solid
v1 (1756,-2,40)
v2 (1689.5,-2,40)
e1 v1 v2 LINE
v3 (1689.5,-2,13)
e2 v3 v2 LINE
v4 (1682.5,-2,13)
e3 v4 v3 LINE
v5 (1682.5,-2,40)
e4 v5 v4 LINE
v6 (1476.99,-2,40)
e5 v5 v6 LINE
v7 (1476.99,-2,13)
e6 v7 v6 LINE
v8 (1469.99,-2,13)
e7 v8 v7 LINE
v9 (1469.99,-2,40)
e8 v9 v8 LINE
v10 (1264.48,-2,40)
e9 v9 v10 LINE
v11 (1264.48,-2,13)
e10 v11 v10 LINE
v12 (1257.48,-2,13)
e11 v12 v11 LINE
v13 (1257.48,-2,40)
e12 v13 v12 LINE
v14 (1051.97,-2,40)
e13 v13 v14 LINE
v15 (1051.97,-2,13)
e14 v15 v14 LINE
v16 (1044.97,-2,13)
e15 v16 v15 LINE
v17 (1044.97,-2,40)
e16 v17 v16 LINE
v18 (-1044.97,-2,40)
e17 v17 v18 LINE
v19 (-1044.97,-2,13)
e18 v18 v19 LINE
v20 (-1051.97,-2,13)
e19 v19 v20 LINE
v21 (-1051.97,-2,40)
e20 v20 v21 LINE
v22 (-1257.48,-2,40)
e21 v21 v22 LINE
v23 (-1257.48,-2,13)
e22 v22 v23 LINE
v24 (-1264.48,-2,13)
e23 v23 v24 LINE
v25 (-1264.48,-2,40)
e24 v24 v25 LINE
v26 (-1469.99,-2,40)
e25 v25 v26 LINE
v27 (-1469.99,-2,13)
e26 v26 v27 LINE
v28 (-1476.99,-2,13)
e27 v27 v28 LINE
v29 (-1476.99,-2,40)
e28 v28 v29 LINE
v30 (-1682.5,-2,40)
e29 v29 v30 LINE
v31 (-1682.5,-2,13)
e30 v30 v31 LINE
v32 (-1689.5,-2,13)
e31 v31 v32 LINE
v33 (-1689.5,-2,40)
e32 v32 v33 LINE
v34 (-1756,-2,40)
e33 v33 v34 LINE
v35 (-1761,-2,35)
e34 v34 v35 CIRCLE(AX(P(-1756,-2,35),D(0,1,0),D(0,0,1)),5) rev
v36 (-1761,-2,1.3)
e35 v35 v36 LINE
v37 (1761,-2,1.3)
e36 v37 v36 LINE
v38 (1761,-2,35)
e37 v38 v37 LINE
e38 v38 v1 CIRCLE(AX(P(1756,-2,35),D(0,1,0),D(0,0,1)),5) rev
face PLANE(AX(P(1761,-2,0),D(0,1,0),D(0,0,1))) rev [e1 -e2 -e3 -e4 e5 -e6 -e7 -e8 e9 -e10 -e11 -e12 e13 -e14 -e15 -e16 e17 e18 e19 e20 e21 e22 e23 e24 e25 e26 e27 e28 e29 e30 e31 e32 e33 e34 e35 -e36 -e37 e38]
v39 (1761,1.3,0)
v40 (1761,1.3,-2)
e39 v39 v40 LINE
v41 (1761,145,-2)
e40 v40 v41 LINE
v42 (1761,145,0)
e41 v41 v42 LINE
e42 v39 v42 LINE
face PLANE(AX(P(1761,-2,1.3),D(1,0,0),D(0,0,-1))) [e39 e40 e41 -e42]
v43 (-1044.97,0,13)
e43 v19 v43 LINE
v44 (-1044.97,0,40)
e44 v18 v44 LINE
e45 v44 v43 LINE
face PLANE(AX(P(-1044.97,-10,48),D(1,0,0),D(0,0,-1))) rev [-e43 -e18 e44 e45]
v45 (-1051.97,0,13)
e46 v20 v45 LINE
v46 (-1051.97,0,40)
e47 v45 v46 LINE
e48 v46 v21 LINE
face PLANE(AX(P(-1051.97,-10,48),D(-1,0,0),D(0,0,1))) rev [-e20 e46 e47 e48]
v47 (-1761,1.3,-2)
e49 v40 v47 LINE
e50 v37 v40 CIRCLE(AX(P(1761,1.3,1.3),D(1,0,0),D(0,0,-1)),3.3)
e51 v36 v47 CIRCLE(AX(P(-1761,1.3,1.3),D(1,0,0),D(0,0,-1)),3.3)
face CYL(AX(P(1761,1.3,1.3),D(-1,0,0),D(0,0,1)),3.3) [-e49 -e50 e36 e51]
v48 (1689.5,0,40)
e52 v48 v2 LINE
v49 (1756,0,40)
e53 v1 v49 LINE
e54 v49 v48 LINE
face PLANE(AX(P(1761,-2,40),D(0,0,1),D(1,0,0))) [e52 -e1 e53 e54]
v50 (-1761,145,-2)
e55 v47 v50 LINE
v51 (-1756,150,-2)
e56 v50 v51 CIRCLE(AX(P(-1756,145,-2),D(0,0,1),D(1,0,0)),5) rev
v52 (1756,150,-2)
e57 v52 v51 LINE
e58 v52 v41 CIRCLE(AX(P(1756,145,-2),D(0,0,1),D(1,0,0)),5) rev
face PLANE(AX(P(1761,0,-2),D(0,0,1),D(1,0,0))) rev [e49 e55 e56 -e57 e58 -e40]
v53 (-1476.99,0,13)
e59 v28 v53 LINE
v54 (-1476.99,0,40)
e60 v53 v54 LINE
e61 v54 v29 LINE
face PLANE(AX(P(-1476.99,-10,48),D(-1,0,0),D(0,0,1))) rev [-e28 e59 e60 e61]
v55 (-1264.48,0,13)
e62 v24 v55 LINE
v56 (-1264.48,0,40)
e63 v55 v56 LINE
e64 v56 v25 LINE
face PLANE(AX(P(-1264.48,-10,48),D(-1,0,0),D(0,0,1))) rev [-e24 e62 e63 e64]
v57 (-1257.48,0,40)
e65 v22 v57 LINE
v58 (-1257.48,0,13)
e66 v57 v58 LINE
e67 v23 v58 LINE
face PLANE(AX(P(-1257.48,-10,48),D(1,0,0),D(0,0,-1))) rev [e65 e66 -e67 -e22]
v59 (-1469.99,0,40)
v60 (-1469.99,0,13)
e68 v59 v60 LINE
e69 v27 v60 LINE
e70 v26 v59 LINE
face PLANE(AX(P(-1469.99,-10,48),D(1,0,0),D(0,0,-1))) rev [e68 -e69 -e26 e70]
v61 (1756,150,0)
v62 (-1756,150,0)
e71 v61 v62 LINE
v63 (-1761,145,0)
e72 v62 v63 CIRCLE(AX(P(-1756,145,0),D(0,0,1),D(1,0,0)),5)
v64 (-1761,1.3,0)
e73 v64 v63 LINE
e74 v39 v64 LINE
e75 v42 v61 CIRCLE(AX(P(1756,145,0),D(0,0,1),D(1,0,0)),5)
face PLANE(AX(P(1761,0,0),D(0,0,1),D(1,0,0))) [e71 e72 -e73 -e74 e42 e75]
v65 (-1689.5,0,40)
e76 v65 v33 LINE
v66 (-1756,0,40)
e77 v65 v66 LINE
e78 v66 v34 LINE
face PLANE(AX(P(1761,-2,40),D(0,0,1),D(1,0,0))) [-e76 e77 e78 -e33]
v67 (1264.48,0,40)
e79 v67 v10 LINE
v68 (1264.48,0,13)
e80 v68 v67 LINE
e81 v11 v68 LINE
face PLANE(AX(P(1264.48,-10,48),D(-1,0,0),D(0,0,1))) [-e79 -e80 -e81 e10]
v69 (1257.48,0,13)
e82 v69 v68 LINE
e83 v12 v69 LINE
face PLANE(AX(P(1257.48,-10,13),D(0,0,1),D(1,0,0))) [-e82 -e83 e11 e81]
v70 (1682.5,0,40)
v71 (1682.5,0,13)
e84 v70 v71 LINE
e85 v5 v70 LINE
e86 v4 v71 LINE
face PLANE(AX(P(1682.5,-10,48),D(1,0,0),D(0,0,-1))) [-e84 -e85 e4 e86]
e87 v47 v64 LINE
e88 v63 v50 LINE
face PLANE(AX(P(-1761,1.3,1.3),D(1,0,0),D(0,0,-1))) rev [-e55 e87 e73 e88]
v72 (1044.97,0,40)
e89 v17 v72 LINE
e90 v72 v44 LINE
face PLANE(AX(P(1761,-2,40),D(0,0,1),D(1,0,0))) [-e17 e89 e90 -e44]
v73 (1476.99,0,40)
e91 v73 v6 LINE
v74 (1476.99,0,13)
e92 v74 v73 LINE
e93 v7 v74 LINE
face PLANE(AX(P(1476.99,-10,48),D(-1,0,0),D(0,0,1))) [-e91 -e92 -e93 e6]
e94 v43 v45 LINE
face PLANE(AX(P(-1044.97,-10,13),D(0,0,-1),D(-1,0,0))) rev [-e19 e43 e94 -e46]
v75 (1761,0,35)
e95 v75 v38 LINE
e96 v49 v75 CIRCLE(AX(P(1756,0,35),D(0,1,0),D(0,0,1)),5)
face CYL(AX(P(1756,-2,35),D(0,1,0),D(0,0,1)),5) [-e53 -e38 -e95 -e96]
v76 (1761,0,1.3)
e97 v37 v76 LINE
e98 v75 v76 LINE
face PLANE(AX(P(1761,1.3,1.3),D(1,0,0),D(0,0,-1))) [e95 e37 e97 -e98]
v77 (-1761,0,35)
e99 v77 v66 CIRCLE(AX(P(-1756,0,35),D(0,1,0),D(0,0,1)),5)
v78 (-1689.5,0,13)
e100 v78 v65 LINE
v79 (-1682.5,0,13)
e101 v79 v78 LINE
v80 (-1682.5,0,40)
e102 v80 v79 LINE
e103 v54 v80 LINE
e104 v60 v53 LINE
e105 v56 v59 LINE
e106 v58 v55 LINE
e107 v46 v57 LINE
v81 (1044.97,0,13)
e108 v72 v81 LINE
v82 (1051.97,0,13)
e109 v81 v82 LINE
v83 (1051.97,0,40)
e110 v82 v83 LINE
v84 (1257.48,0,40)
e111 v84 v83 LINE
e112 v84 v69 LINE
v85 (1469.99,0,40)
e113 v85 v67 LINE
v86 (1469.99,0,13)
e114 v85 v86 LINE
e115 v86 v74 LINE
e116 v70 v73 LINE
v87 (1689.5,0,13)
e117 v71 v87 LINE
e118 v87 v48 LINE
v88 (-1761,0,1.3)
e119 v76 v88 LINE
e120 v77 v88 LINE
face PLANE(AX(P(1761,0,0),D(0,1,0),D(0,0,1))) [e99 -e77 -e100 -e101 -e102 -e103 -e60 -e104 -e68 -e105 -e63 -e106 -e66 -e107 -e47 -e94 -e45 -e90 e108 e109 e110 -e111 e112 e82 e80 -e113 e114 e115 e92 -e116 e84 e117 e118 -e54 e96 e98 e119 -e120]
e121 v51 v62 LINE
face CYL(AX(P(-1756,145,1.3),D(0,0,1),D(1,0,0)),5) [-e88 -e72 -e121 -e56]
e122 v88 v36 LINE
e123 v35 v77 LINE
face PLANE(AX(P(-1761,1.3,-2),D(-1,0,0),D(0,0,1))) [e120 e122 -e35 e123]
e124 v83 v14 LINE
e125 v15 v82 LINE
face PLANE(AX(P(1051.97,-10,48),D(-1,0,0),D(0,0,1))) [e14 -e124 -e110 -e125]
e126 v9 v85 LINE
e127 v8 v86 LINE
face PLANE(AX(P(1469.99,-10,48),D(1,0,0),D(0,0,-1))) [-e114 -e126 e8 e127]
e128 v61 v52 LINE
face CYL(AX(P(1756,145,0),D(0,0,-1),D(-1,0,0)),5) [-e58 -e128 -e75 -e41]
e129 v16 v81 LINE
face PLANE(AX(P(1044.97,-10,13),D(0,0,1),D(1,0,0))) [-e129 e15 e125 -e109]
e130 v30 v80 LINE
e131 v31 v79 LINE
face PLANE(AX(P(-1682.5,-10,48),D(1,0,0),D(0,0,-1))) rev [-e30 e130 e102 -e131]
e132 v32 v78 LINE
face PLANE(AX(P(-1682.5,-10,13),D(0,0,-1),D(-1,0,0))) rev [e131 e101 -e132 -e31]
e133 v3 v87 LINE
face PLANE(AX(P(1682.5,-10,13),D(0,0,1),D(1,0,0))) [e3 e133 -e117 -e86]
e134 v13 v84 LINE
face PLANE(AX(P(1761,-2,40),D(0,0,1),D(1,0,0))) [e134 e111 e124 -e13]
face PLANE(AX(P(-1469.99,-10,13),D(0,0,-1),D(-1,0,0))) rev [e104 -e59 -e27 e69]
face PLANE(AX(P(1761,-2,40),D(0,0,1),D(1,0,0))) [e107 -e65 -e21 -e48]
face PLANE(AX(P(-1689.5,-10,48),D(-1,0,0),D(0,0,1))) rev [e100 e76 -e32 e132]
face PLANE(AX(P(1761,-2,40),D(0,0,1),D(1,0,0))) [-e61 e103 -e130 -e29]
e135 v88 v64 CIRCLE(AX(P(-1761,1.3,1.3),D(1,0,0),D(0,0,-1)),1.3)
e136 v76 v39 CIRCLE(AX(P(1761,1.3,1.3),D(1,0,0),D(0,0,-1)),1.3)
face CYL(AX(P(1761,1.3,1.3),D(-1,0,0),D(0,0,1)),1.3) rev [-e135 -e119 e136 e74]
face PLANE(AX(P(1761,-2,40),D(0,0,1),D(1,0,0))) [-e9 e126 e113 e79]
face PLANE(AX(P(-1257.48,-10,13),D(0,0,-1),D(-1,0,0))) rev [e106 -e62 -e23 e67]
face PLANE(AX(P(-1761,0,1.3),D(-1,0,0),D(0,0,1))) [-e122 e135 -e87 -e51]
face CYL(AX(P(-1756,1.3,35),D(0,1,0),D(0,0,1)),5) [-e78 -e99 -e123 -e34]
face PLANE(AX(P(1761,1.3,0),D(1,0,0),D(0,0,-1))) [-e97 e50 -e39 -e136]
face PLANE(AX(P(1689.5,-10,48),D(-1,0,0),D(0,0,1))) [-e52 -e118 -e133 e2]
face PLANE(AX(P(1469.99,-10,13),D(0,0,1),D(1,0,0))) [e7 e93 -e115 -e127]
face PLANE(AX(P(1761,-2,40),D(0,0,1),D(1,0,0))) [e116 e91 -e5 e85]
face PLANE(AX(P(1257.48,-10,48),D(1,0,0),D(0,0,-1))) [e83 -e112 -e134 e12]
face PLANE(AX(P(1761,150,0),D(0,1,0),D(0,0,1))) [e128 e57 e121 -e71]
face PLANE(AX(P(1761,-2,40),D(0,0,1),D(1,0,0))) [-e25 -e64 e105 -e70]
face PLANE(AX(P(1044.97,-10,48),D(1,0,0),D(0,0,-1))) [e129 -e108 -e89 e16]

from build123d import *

# Parameters (mm, degrees)
BASE_FLANGE1_DEPTH       = 1761
FILLET1_R                = 5
SKETCH2_W                = 7
SKETCH2_H                = 35
CUT_EXTRUDE1_DEPTH       = 10
PATTERN_LINEAR_1_COUNT   = 4
PATTERN_LINEAR_1_PITCH   = 212.51
MIRROR_1_COPY_1_SKETCH_W = 7
MIRROR_1_COPY_1_SKETCH_H = 35
MIRROR_1_COPY_1_DEPTH    = 10
MIRROR_1_COPY_2_SKETCH_W = 7
MIRROR_1_COPY_2_SKETCH_H = 35
MIRROR_1_COPY_2_DEPTH    = 10
MIRROR_1_COPY_3_SKETCH_W = 7
MIRROR_1_COPY_3_SKETCH_H = 35
MIRROR_1_COPY_3_DEPTH    = 10


# Sheet-metal steps are written as plain solids
with BuildPart() as part:
    # Sketch1 → Base-Flange1 (new, symmetric)
    with BuildSketch(Plane(origin=(0, 0, 0), x_dir=(0, 0, -1), z_dir=(1, 0, 0))):
        with BuildLine():
            Line((-40, 0), (-1.3, 0))
            ThreePointArc((-1.3, 0), (-0.380761184, 0.380761184), (0, 1.3))
            Line((0, 1.3), (0, 150))
            Line((0, 150), (2, 150))
            Line((2, 150), (2, 1.3))
            ThreePointArc((2, 1.3), (1.033452378, -1.033452378), (-1.3, -2))
            Line((-1.3, -2), (-40, -2))
            Line((-40, -2), (-40, 0))
        make_face()
    extrude(amount=BASE_FLANGE1_DEPTH, both=True)

    # Fillet1
    fillet1_edges = [part.edges().sort_by_distance(p)[0] for p in [
        (1761, -1, 40),
        (-1761, -1, 40),
        (1761, 150, -1),
        (-1761, 150, -1),
    ]]
    fillet(fillet1_edges, radius=FILLET1_R)

    # Sketch2 → Cut-Extrude1 (cut)
    with BuildSketch(Plane(origin=(0, 0, 0), x_dir=(1, 0, 0), z_dir=(0, 1, 0))):
        with Locations((-1686, -30.5)):
            Rectangle(SKETCH2_W, SKETCH2_H)
    cut_extrude1 = extrude(amount=-CUT_EXTRUDE1_DEPTH, mode=Mode.SUBTRACT)

    # 阵列(线性)1: Cut-Extrude1 ×4
    with Locations(*[(i * PATTERN_LINEAR_1_PITCH, 0, 0) for i in range(1, PATTERN_LINEAR_1_COUNT)]):
        add(cut_extrude1, mode=Mode.SUBTRACT)

    # 镜向1: Cut-Extrude1 across plane
    add(cut_extrude1.mirror(Plane.ZY), mode=Mode.SUBTRACT)

    # 镜向1 copy 1 sketch → 镜向1 copy 1 (cut)
    with BuildSketch(Plane(origin=(-212.51, 0, 0), x_dir=(-1, 0, 0), z_dir=(0, 1, 0))):
        with Locations((-1686, 30.5)):
            Rectangle(MIRROR_1_COPY_1_SKETCH_W, MIRROR_1_COPY_1_SKETCH_H)
    extrude(amount=-MIRROR_1_COPY_1_DEPTH, mode=Mode.SUBTRACT)

    # 镜向1 copy 2 sketch → 镜向1 copy 2 (cut)
    with BuildSketch(Plane(origin=(-425.02, 0, 0), x_dir=(-1, 0, 0), z_dir=(0, 1, 0))):
        with Locations((-1686, 30.5)):
            Rectangle(MIRROR_1_COPY_2_SKETCH_W, MIRROR_1_COPY_2_SKETCH_H)
    extrude(amount=-MIRROR_1_COPY_2_DEPTH, mode=Mode.SUBTRACT)

    # 镜向1 copy 3 sketch → 镜向1 copy 3 (cut)
    with BuildSketch(Plane(origin=(-637.53, 0, 0), x_dir=(-1, 0, 0), z_dir=(0, 1, 0))):
        with Locations((-1686, 30.5)):
            Rectangle(MIRROR_1_COPY_3_SKETCH_W, MIRROR_1_COPY_3_SKETCH_H)
    extrude(amount=-MIRROR_1_COPY_3_DEPTH, mode=Mode.SUBTRACT)


solid = part.part
